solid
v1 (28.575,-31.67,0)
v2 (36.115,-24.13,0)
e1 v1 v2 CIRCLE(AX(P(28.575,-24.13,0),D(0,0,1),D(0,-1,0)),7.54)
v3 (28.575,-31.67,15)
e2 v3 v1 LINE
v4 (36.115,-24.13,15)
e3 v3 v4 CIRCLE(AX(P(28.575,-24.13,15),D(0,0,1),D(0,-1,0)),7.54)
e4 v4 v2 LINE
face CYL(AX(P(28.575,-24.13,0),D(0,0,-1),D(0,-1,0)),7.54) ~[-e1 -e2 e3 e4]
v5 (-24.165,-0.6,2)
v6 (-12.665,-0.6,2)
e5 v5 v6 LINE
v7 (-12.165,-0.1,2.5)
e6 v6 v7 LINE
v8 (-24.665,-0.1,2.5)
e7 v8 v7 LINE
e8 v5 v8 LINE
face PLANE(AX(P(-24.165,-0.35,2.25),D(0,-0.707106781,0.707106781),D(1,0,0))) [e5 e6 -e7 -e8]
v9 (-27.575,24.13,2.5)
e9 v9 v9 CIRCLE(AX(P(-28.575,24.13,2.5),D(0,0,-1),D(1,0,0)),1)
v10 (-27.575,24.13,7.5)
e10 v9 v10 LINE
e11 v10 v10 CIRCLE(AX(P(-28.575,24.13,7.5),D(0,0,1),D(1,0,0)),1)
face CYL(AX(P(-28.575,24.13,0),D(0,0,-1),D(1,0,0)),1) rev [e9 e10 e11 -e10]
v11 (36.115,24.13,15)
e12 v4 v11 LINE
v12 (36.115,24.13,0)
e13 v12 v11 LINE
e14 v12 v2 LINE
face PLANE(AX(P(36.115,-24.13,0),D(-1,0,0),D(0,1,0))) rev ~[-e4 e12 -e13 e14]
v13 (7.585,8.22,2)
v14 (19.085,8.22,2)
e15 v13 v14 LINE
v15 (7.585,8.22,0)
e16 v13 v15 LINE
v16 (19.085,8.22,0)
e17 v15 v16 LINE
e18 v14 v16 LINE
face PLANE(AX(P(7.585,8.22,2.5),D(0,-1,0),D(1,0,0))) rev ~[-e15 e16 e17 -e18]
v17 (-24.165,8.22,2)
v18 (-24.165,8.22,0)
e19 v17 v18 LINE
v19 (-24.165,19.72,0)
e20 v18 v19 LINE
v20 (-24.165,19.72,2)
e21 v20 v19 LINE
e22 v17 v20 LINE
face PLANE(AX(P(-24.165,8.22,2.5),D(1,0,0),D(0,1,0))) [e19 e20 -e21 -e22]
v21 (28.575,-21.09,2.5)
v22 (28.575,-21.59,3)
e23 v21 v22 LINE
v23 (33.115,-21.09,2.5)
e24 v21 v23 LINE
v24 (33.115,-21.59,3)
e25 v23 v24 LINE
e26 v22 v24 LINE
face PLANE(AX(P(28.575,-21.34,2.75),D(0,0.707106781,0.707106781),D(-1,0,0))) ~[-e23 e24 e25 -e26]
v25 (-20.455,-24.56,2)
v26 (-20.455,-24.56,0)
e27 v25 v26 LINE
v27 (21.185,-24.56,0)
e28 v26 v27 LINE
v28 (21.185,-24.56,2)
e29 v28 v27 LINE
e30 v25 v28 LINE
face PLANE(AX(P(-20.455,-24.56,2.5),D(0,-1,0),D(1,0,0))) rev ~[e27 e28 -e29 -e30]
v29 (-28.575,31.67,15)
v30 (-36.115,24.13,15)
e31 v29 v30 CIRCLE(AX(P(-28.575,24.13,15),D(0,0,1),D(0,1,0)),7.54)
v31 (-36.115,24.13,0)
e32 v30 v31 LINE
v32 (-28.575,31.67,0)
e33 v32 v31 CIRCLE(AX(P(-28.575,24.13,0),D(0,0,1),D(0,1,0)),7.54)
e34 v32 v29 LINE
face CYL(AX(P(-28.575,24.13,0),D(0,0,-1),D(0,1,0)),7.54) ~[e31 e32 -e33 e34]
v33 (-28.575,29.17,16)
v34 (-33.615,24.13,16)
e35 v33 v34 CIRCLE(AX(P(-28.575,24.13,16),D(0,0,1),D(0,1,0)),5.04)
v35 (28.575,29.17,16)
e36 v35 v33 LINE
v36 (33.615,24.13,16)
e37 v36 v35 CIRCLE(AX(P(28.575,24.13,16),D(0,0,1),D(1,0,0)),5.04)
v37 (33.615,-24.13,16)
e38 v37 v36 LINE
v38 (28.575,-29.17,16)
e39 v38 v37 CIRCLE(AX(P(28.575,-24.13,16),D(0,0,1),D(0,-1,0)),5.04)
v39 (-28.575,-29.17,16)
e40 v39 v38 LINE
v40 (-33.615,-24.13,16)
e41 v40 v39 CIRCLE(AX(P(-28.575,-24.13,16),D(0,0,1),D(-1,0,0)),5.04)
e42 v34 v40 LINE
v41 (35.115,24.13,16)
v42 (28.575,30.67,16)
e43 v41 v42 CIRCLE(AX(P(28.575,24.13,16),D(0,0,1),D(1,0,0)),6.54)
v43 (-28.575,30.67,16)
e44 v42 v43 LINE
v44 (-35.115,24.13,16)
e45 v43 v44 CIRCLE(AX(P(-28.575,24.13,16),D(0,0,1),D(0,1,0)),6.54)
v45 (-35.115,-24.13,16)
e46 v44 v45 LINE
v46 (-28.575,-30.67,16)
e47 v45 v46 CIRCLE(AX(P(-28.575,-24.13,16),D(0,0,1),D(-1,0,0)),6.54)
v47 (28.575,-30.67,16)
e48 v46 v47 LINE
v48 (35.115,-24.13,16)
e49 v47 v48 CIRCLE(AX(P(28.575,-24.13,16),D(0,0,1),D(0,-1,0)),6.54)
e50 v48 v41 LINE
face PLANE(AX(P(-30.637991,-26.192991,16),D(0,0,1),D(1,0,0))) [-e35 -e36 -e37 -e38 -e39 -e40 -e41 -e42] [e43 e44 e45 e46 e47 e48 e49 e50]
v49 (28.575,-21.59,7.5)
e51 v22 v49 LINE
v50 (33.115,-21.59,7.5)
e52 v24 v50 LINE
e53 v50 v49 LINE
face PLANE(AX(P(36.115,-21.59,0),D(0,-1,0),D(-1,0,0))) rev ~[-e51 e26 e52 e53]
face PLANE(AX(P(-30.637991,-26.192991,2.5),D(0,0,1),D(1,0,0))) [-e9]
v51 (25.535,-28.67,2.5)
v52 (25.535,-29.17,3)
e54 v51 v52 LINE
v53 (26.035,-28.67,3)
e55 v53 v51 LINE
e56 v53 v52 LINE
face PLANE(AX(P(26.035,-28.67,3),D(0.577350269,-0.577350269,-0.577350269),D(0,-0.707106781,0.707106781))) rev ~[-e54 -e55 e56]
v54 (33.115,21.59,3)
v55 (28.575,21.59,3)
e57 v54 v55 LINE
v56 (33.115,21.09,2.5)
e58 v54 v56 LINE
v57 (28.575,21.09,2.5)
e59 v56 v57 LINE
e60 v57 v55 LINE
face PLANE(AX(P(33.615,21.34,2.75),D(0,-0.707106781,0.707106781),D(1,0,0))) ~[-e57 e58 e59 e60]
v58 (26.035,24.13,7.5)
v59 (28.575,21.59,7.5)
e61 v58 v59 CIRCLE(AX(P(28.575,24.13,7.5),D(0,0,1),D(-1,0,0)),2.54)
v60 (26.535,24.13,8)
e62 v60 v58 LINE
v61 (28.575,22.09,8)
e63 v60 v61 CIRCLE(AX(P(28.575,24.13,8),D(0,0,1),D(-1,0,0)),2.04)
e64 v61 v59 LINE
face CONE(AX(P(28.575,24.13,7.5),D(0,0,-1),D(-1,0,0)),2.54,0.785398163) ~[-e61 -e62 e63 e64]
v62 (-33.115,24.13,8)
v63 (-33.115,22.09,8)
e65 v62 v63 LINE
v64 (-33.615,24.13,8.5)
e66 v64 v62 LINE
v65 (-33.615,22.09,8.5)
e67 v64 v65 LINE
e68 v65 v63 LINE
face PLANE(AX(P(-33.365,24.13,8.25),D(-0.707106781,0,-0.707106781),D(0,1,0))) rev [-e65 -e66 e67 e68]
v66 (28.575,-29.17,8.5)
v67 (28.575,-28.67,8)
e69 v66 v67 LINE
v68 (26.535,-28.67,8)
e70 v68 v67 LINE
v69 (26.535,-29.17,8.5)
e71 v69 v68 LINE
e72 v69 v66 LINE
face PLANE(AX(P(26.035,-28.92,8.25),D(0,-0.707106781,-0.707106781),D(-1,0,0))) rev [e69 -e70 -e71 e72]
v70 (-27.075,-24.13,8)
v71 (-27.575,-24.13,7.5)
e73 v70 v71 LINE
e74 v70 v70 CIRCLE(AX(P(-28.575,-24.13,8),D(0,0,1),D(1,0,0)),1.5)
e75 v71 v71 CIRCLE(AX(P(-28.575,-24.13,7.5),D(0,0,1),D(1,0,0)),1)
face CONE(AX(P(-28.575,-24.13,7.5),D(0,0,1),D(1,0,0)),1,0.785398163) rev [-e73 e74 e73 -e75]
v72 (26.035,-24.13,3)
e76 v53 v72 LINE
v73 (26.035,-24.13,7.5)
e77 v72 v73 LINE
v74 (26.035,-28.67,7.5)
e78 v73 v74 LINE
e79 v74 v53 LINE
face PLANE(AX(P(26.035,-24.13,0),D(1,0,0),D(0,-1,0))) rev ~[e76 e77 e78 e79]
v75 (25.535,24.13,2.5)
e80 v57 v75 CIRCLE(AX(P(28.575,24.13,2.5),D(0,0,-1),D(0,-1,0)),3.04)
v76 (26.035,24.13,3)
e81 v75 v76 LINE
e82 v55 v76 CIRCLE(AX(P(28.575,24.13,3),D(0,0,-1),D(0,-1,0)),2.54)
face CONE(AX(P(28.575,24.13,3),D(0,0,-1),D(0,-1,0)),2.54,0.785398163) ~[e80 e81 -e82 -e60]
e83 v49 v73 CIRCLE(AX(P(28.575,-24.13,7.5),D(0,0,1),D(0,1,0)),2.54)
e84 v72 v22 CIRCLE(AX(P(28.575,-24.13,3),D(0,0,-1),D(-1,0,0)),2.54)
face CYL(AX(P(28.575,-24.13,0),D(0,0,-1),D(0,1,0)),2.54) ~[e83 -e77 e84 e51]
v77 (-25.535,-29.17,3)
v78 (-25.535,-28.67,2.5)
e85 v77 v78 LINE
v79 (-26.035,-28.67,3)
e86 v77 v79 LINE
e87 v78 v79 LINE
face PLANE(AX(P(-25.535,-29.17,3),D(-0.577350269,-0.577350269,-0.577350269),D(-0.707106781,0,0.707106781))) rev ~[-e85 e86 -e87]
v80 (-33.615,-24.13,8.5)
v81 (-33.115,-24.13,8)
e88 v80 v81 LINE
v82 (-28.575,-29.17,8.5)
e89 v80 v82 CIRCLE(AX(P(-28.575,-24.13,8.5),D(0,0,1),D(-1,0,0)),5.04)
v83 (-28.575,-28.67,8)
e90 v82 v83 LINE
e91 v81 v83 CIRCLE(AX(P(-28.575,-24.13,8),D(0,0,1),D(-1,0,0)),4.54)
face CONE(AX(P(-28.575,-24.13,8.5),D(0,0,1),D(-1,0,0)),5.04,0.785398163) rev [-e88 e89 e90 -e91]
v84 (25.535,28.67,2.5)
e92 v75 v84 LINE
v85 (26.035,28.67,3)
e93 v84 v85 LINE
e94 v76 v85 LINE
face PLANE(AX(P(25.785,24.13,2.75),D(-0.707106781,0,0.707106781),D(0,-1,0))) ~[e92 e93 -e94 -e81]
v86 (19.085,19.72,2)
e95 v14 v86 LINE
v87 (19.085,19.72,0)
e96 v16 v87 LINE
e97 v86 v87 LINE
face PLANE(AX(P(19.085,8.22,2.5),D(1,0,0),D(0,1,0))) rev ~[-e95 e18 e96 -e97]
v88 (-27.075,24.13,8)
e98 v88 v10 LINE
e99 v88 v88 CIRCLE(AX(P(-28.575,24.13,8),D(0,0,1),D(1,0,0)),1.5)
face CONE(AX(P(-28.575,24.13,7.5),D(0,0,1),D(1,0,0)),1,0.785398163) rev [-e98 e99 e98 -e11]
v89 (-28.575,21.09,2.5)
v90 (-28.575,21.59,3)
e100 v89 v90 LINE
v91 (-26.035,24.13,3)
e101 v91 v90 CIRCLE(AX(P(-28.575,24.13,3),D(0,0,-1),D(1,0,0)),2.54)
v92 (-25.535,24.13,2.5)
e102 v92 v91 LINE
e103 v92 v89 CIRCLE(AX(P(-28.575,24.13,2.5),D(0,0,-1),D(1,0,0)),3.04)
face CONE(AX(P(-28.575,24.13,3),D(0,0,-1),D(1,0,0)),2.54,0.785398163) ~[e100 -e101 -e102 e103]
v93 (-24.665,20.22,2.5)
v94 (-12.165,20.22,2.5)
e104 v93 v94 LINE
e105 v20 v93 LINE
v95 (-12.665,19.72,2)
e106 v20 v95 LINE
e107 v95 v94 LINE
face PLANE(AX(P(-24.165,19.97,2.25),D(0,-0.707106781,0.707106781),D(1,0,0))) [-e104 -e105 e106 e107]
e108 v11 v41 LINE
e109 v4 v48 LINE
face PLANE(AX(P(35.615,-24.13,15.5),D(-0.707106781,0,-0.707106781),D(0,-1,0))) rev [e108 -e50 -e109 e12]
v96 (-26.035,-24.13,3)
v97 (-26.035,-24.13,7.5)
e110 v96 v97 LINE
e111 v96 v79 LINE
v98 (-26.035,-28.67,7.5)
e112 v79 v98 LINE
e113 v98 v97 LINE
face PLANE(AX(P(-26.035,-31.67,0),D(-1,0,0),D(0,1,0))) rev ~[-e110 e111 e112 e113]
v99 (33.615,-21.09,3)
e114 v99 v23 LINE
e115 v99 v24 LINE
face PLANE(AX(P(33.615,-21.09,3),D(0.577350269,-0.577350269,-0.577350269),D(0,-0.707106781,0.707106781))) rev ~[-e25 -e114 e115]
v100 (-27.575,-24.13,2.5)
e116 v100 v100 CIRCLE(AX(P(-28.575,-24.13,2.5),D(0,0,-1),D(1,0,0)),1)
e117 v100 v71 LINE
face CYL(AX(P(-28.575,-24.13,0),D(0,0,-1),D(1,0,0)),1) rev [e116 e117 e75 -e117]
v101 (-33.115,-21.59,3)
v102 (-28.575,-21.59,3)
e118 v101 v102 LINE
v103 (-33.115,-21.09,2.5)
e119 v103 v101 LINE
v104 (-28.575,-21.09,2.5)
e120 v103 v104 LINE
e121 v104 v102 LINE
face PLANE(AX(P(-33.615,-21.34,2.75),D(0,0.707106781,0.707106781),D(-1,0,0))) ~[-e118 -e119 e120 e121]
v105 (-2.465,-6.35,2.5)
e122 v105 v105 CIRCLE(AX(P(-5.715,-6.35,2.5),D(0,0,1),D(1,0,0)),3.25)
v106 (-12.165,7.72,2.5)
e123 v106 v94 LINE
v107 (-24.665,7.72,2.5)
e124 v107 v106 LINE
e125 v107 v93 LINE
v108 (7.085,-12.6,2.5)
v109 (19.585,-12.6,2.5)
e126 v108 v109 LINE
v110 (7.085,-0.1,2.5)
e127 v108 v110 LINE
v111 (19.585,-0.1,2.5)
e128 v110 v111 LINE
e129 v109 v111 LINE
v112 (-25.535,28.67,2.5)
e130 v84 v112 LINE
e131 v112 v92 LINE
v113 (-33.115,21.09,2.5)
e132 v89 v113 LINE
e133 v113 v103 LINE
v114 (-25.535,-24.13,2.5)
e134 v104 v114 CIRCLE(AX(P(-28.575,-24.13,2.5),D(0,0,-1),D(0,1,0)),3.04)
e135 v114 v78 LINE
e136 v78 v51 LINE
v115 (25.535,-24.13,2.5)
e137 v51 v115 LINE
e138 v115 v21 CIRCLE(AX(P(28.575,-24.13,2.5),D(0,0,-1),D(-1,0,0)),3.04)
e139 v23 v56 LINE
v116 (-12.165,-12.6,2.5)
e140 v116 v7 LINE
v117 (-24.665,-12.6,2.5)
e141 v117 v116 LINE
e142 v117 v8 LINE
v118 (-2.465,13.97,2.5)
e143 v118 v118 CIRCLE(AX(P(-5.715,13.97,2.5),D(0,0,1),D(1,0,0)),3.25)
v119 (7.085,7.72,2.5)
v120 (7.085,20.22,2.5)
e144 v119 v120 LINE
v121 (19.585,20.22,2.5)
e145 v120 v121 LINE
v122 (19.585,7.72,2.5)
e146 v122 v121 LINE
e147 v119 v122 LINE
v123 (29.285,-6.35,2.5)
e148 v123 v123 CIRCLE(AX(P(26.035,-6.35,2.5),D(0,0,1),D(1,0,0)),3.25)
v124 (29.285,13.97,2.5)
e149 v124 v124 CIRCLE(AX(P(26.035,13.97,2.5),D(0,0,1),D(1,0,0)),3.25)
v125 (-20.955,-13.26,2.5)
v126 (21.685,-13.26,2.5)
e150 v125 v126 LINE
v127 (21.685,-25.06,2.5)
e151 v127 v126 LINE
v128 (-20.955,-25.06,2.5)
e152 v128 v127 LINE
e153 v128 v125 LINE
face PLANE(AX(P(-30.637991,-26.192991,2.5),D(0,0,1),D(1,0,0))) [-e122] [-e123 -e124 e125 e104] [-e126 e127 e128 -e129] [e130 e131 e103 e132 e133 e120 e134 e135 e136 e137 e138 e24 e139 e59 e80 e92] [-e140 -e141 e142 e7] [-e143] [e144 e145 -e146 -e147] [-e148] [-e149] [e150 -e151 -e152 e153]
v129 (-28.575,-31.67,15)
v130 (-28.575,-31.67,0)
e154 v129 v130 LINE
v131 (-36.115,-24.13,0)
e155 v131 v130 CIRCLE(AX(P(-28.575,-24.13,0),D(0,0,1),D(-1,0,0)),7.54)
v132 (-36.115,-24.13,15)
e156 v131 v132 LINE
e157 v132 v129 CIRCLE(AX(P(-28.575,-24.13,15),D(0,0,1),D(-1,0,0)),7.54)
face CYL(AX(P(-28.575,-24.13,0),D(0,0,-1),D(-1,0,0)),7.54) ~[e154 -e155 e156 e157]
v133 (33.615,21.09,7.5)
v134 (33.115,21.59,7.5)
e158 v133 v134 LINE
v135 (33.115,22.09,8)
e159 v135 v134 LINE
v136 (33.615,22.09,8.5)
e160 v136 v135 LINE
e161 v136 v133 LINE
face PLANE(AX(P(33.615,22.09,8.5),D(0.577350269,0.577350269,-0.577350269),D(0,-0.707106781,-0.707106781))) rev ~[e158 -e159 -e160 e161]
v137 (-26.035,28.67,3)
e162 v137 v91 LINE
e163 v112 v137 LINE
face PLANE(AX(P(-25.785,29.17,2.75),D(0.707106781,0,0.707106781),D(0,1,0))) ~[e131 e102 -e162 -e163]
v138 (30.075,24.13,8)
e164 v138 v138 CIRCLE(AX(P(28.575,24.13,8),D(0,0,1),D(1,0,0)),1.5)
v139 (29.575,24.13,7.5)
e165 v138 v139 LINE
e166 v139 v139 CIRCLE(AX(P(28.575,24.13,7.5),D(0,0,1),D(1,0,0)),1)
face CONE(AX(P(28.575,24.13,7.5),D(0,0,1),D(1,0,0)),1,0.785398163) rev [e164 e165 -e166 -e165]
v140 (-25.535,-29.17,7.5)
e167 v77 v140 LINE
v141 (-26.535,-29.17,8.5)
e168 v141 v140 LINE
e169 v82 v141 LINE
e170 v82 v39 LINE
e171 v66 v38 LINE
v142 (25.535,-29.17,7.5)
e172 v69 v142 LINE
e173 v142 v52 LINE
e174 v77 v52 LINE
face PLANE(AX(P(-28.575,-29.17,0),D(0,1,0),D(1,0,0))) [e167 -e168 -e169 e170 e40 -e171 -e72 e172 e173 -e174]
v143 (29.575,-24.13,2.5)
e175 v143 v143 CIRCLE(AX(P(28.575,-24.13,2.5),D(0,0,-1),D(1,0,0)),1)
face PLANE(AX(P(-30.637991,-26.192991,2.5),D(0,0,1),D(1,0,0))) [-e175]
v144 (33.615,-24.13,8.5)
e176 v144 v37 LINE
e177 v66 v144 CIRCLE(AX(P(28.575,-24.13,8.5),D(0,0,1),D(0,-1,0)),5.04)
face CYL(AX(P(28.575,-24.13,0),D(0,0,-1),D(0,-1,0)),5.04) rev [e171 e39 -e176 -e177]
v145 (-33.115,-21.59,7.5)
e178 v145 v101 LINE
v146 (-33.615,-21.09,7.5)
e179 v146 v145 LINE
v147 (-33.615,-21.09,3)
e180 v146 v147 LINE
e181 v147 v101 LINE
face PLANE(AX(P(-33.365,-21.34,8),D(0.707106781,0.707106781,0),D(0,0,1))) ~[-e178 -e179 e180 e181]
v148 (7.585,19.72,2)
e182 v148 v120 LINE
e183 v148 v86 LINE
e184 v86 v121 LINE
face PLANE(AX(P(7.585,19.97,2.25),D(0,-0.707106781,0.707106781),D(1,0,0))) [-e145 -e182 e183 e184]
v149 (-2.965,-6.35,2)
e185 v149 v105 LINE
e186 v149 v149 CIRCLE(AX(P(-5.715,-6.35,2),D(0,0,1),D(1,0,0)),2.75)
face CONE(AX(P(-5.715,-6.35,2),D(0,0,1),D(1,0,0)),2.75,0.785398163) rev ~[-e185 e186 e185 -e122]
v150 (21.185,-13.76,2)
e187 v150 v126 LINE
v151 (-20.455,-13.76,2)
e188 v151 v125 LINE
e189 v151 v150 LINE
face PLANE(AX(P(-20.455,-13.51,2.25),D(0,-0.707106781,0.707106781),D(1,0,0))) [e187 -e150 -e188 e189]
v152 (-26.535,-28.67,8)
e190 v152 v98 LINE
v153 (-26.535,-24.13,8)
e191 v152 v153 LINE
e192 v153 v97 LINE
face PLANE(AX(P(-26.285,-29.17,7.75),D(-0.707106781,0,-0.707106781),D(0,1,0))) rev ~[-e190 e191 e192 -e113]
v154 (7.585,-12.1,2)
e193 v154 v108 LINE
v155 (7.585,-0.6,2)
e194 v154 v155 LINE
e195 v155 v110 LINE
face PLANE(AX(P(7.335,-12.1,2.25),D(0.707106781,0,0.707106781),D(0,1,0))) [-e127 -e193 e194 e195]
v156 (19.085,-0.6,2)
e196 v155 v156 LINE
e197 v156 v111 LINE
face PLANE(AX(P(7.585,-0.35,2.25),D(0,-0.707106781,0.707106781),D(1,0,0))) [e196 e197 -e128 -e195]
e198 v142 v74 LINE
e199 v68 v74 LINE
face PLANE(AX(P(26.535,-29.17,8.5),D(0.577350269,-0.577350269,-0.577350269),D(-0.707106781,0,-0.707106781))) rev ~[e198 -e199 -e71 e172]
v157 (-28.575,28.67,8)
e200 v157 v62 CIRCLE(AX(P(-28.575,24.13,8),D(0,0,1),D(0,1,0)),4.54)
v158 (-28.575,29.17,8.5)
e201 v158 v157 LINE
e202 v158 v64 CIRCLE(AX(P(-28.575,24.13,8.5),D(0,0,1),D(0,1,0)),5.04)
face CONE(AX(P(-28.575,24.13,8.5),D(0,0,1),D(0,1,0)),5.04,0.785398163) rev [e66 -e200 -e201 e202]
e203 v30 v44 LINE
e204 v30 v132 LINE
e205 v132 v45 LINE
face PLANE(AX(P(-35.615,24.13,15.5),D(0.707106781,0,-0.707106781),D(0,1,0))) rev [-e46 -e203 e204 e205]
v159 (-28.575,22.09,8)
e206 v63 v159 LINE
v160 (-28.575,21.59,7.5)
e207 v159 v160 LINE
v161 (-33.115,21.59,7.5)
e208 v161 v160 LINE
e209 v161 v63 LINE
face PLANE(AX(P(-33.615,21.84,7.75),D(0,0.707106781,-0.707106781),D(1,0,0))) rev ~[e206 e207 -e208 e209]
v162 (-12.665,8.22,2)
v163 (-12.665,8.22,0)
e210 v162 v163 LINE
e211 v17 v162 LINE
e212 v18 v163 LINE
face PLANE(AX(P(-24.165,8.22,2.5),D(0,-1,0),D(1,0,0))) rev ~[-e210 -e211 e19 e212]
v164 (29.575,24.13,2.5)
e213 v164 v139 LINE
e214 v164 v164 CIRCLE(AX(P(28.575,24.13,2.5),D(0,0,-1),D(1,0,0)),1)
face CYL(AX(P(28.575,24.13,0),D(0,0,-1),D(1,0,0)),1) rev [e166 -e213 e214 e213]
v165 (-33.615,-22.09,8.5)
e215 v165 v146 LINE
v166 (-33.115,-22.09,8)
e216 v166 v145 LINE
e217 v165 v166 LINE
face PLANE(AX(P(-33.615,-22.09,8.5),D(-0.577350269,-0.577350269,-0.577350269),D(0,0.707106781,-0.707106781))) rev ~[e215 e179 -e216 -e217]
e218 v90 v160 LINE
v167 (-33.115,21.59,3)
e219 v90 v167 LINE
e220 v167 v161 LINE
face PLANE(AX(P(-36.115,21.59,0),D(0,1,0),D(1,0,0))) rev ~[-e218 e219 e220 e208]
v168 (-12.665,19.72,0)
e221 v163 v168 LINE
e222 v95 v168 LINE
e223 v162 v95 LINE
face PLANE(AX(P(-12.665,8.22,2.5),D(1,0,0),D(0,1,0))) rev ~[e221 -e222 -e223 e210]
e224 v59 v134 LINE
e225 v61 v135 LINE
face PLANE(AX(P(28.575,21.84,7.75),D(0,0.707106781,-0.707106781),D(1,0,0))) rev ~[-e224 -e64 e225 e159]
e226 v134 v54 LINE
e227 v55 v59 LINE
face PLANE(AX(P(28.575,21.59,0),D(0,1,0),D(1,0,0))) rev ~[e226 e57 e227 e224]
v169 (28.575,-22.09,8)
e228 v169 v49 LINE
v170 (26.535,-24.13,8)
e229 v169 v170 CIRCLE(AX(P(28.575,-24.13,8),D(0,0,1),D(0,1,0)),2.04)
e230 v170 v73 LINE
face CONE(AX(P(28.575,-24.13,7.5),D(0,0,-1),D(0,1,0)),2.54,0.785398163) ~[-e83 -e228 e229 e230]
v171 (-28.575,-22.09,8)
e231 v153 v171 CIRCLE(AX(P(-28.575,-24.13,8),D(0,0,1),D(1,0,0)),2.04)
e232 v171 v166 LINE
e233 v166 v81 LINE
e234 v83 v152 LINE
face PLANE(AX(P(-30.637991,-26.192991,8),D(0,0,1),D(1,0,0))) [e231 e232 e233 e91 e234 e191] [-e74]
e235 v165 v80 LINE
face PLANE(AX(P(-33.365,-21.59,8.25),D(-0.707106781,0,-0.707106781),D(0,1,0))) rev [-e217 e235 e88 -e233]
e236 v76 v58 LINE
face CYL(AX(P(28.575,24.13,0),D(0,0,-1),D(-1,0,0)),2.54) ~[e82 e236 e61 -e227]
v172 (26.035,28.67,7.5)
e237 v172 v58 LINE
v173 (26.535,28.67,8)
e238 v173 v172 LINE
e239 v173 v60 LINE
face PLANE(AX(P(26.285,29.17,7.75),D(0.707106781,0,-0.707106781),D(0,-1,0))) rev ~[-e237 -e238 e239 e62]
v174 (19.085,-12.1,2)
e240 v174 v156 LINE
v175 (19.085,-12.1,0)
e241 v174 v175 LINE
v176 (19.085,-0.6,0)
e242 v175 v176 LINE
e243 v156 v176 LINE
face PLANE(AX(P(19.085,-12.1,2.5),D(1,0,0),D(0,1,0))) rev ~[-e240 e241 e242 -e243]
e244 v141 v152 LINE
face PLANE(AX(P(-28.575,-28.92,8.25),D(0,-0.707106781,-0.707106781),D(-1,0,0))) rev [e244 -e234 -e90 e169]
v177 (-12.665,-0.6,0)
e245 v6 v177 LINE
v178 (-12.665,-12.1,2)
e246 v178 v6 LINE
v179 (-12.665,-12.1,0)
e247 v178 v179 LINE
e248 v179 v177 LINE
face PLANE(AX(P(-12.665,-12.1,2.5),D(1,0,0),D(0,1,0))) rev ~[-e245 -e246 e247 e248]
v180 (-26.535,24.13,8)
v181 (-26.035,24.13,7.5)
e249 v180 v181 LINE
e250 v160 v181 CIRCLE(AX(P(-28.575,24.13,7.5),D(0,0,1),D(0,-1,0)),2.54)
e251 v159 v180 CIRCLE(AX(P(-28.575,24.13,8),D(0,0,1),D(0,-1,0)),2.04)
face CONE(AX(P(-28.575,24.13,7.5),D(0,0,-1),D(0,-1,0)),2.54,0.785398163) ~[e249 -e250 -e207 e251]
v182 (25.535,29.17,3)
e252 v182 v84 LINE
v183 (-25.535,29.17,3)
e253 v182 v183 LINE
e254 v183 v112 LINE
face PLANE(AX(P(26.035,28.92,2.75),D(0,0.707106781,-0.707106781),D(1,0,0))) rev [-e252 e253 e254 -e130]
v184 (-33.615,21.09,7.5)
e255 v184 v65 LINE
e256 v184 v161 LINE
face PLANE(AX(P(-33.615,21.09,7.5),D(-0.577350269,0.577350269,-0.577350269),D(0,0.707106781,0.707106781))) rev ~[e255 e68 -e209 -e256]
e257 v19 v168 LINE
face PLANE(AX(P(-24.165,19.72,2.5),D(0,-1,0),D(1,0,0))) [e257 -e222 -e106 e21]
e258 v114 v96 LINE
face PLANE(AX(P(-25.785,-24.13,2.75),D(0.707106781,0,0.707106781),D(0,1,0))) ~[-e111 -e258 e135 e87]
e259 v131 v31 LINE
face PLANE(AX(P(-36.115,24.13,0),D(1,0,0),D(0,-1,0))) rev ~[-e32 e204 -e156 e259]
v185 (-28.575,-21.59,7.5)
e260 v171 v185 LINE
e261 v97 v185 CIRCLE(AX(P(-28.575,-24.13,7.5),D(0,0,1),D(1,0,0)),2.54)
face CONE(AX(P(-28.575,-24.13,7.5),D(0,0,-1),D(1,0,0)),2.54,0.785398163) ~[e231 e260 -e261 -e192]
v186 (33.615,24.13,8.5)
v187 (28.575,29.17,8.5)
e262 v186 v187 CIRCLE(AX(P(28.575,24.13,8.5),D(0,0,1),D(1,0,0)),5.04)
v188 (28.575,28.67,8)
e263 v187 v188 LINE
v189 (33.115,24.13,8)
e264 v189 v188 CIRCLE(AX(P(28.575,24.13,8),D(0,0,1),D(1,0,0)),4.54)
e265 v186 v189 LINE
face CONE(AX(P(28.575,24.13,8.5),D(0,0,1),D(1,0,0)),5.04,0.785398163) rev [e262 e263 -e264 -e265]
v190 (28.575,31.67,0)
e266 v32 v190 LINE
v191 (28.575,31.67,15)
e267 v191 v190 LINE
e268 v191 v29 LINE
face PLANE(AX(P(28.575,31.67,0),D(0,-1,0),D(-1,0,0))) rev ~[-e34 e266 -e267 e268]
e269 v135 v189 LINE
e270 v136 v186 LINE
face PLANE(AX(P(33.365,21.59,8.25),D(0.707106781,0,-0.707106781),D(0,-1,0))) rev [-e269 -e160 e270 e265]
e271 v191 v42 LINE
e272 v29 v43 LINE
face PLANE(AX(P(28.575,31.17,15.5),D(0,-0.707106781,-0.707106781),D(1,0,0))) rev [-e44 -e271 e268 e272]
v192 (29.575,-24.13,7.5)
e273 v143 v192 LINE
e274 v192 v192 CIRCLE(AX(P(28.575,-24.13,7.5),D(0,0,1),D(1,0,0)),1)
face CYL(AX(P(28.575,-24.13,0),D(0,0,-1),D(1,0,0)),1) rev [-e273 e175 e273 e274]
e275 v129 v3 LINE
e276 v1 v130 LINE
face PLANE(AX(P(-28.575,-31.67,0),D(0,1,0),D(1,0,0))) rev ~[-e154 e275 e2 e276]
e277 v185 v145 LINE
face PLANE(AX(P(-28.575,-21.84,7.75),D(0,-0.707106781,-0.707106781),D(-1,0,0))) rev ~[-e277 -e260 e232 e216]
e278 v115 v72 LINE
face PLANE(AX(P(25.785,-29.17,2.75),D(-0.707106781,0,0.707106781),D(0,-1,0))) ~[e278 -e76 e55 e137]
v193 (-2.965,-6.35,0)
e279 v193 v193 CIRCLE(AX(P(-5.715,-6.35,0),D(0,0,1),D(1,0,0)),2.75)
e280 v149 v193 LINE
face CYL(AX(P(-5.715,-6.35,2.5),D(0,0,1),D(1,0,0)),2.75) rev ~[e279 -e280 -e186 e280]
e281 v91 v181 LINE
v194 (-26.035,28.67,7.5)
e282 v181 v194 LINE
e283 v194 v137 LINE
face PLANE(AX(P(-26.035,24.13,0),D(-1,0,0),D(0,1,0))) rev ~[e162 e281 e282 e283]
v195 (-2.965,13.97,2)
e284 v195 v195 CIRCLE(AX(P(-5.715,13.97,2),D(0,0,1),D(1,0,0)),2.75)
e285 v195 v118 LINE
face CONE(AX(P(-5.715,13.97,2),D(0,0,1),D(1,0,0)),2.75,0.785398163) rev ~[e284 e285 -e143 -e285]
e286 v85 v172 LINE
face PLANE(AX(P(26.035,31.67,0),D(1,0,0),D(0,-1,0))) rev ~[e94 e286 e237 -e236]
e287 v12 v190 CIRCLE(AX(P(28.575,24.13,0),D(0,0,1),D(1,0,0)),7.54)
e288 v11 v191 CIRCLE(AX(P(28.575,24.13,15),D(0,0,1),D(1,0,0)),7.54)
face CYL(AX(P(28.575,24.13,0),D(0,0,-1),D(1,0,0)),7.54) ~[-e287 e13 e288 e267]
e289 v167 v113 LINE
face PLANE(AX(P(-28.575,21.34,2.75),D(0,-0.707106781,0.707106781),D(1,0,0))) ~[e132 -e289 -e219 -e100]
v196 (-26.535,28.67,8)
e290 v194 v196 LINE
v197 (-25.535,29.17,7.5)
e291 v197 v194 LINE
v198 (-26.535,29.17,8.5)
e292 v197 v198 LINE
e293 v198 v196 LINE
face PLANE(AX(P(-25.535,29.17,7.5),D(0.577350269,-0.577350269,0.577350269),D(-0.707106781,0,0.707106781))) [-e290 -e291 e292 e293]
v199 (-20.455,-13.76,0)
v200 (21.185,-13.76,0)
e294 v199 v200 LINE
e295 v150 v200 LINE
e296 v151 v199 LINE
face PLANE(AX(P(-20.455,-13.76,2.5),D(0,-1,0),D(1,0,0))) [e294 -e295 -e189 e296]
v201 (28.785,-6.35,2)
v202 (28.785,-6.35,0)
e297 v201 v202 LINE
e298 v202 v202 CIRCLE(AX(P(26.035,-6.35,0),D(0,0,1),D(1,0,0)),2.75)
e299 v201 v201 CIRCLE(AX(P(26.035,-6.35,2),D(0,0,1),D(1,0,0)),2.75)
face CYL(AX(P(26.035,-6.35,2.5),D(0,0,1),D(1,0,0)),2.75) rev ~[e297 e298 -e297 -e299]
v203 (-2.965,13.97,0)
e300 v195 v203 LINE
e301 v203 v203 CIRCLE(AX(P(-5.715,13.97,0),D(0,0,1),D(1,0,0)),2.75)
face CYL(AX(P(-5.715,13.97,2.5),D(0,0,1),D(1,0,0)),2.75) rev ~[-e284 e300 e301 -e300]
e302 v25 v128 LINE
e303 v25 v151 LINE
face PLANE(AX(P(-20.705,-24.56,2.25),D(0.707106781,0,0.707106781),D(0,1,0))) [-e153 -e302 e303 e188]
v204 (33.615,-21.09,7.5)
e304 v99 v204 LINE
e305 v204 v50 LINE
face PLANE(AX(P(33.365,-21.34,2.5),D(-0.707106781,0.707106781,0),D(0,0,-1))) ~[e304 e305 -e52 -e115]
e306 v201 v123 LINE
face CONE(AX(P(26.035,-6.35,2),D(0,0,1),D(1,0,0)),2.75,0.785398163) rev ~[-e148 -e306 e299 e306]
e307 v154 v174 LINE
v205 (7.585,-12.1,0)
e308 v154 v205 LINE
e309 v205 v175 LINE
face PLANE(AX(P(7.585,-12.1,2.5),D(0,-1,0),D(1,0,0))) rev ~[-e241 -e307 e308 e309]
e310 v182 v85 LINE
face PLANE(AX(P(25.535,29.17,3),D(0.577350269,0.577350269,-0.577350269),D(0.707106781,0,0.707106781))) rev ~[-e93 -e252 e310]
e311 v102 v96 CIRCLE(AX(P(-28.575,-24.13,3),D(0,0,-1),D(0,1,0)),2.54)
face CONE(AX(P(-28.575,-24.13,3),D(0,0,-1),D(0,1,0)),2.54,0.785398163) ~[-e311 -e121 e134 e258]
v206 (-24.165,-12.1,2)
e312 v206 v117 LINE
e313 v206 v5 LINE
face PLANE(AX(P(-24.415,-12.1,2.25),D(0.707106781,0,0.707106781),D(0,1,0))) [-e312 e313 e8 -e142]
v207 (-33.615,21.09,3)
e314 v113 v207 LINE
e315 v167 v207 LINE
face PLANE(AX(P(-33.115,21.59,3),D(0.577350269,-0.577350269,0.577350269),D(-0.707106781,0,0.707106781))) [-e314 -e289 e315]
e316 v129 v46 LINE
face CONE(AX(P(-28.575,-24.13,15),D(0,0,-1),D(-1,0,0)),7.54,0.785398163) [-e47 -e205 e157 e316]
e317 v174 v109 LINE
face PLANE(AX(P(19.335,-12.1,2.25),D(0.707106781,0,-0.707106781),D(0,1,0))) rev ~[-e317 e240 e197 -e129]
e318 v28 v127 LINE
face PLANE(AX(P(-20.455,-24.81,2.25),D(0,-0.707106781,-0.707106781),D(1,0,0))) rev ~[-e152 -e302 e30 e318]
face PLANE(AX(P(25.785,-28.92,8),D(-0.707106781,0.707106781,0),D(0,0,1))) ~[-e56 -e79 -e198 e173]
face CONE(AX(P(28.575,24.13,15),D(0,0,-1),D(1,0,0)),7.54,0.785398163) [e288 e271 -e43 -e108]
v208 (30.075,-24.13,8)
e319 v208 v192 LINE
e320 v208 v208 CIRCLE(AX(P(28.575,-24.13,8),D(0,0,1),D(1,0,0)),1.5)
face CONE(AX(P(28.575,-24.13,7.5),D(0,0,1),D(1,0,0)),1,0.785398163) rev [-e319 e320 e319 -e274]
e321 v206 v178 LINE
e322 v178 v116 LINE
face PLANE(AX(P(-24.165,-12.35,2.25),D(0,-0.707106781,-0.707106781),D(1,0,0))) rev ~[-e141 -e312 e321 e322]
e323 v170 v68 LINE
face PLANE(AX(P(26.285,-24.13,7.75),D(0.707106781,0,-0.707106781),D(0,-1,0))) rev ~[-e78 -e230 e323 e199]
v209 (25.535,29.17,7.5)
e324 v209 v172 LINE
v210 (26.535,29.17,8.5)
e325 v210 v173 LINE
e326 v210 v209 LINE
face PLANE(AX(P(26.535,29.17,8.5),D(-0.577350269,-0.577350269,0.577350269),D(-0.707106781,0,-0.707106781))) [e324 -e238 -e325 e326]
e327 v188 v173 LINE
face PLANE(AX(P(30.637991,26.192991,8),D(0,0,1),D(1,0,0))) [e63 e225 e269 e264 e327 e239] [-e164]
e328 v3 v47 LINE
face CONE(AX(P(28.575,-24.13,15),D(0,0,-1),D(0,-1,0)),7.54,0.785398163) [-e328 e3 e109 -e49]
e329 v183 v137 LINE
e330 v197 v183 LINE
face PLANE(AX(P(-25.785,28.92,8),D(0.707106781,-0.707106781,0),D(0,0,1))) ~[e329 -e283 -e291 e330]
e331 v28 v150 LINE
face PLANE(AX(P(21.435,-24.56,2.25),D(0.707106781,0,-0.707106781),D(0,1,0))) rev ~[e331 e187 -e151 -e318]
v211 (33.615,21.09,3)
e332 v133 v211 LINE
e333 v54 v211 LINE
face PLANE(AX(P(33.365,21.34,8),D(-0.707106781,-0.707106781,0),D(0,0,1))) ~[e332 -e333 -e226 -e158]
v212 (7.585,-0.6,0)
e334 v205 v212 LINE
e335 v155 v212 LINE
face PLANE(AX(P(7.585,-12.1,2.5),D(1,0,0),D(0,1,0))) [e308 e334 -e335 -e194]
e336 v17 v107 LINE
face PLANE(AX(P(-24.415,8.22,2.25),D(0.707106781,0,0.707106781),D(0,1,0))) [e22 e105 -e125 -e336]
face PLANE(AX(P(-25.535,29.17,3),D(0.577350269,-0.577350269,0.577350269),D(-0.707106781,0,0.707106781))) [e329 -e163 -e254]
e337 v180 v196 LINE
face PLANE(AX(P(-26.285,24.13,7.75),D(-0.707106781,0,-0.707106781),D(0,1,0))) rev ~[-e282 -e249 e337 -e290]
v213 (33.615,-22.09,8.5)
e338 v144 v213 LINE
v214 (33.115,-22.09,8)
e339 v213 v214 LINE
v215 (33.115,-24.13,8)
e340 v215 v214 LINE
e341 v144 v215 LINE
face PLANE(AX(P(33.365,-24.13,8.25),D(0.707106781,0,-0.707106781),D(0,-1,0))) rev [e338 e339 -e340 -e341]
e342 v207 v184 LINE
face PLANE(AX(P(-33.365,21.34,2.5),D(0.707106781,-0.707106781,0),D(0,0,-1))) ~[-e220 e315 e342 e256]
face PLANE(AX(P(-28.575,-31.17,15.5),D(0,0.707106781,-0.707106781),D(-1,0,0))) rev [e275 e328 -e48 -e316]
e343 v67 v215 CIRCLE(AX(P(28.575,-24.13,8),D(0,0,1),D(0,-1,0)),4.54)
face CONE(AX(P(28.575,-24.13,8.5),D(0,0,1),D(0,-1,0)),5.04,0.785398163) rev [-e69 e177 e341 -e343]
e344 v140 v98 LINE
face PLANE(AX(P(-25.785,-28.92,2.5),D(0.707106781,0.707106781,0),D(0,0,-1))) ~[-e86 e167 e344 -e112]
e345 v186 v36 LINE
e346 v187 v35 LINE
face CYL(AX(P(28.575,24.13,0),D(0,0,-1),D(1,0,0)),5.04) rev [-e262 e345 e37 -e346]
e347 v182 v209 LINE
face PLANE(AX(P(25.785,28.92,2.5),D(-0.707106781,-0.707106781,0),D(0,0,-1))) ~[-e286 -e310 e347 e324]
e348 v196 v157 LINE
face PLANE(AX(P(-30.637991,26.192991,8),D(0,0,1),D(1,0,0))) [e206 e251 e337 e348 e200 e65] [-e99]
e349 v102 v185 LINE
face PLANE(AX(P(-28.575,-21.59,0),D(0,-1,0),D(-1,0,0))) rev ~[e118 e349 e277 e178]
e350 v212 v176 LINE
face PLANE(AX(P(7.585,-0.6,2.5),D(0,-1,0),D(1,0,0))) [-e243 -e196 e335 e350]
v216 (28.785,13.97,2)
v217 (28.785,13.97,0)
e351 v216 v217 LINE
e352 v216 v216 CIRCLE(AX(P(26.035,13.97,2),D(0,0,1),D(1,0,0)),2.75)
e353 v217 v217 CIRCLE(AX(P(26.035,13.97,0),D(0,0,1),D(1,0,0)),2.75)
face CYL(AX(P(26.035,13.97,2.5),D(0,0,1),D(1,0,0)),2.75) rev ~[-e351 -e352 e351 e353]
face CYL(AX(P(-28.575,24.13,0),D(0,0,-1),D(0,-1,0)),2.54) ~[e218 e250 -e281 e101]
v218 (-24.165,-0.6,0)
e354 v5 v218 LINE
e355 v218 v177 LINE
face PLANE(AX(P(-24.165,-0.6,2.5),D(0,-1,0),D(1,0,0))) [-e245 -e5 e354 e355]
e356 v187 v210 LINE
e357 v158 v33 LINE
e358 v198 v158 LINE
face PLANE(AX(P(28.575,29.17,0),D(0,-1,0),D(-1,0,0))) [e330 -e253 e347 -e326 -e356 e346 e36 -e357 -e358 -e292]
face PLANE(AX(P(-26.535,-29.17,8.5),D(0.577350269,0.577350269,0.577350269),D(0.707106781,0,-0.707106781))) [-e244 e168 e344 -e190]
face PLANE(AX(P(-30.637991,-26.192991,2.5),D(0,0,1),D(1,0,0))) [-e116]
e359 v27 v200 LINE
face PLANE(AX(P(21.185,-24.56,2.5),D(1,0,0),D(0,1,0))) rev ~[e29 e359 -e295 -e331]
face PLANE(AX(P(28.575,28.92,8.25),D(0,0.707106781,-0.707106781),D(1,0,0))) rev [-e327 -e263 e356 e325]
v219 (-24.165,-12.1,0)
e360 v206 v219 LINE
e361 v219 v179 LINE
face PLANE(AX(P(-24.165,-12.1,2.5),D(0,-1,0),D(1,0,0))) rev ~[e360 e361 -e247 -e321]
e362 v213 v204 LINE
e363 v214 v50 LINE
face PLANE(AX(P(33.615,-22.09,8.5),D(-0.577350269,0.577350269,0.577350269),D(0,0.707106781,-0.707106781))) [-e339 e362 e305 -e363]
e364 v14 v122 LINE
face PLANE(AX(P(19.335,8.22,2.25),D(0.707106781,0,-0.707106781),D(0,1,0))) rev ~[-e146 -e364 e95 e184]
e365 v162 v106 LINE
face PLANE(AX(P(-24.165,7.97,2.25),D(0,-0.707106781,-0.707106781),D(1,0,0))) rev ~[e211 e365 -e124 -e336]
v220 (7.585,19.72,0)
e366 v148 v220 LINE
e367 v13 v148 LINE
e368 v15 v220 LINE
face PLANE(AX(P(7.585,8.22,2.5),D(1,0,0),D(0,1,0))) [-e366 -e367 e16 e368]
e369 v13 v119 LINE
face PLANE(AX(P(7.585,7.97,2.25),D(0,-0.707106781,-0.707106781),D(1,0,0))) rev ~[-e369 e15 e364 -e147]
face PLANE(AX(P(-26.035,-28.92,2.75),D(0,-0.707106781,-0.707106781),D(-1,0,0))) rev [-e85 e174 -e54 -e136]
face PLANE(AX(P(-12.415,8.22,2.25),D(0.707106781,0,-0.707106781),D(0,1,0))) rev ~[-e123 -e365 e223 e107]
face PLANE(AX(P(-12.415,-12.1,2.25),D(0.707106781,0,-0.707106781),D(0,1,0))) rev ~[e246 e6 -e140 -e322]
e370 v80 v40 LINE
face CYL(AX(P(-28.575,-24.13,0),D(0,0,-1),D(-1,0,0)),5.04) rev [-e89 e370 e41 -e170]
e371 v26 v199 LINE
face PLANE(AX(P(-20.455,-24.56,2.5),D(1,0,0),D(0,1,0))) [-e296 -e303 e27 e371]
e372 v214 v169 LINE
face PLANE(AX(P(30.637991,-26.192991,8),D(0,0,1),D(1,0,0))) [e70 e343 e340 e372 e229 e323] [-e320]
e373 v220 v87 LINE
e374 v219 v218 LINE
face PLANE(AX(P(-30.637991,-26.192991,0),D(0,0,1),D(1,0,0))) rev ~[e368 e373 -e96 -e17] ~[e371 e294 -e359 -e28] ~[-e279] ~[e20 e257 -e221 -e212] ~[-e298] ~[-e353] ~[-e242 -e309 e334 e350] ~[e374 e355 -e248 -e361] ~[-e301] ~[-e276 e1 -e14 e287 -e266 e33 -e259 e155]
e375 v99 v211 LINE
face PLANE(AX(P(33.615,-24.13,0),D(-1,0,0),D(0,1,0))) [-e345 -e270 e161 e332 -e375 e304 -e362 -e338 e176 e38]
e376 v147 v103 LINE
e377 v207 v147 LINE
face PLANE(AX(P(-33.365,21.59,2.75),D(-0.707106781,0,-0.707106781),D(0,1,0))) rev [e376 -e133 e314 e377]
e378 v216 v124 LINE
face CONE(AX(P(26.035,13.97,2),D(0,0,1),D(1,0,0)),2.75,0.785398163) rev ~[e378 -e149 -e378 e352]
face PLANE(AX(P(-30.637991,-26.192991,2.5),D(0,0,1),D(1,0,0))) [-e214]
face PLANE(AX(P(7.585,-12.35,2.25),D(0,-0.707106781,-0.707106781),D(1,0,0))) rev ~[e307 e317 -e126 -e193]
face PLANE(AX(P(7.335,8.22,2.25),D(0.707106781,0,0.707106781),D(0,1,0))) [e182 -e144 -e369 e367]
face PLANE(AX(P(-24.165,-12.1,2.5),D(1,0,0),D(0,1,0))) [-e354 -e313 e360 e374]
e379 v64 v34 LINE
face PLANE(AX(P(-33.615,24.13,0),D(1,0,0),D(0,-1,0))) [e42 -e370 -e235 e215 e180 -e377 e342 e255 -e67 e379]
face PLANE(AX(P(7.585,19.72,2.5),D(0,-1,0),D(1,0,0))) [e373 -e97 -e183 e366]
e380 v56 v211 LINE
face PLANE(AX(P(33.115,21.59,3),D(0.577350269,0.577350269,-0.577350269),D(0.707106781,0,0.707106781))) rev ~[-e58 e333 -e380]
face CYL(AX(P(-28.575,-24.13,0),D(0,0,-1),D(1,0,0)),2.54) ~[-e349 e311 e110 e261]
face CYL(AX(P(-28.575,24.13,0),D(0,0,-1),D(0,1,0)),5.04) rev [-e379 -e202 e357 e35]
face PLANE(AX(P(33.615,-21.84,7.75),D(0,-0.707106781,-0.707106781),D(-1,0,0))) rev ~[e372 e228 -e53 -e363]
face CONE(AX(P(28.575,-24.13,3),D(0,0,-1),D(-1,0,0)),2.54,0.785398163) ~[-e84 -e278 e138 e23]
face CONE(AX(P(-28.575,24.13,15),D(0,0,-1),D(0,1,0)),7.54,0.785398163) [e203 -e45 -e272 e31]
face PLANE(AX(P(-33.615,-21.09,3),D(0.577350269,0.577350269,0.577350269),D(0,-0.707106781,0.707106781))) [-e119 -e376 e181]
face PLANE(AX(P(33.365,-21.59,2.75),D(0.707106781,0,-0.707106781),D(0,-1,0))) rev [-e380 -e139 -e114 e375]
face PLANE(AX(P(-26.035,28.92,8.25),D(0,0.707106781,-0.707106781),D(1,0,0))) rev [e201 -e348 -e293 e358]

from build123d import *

# Parameters (mm, degrees)
F0_R     = 1
F1_DEPTH = 16
F2_T     = -2.5
F3_DEPTH = 8
F4_W     = 41.64
F4_H     = 10.8
F4_W_2   = 11.5
F4_H_2   = 11.5
F4_R     = 2.75
F5_DEPTH = 2.501
F6_SIZE  = 1
F7_SIZE  = 0.5


with BuildPart() as f1:
    # F0 (on Top) → F1 (new body)
    with BuildSketch(Plane.XY):
        with BuildLine():
            ThreePointArc((-36.115, -24.13), (-33.9065851301, -29.4615851301), (-28.575, -31.67))
            Line((-28.575, -31.67), (-26.035, -31.67))
            Line((-26.035, -31.67), (-26.035, -24.13))
            ThreePointArc((-26.035, -24.13), (-26.7789487758, -22.3339487758), (-28.575, -21.59))
            Line((-28.575, -21.59), (-36.115, -21.59))
            Line((-36.115, -21.59), (-36.115, -24.13))
        make_face()
        with Locations((-28.575, -24.13)):
            Circle(F0_R, mode=Mode.SUBTRACT)
        with BuildLine():
            Line((-26.035, -24.13), (-26.035, -31.67))
            Line((-26.035, -31.67), (26.035, -31.67))
            Line((26.035, -31.67), (26.035, -24.13))
            ThreePointArc((26.035, -24.13), (26.7789487758, -22.3339487758), (28.575, -21.59))
            Line((28.575, -21.59), (36.115, -21.59))
            Line((36.115, -21.59), (36.115, 21.59))
            Line((36.115, 21.59), (28.575, 21.59))
            ThreePointArc((28.575, 21.59), (26.7789487758, 22.3339487758), (26.035, 24.13))
            Line((26.035, 24.13), (26.035, 31.67))
            Line((26.035, 31.67), (-26.035, 31.67))
            Line((-26.035, 31.67), (-26.035, 24.13))
            ThreePointArc((-26.035, 24.13), (-26.7789487758, 22.3339487758), (-28.575, 21.59))
            Line((-28.575, 21.59), (-36.115, 21.59))
            Line((-36.115, 21.59), (-36.115, -21.59))
            Line((-36.115, -21.59), (-28.575, -21.59))
            ThreePointArc((-28.575, -21.59), (-26.7789487758, -22.3339487758), (-26.035, -24.13))
        make_face()
        with BuildLine():
            Line((-36.115, 24.13), (-36.115, 21.59))
            Line((-36.115, 21.59), (-28.575, 21.59))
            ThreePointArc((-28.575, 21.59), (-26.7789487758, 22.3339487758), (-26.035, 24.13))
            Line((-26.035, 24.13), (-26.035, 31.67))
            Line((-26.035, 31.67), (-28.575, 31.67))
            ThreePointArc((-28.575, 31.67), (-33.9065851301, 29.4615851301), (-36.115, 24.13))
        make_face()
        with Locations((-28.575, 24.13)):
            Circle(F0_R, mode=Mode.SUBTRACT)
        with BuildLine():
            Line((26.035, -24.13), (26.035, -31.67))
            Line((26.035, -31.67), (28.575, -31.67))
            ThreePointArc((28.575, -31.67), (33.9065851301, -29.4615851301), (36.115, -24.13))
            Line((36.115, -24.13), (36.115, -21.59))
            Line((36.115, -21.59), (28.575, -21.59))
            ThreePointArc((28.575, -21.59), (26.7789487758, -22.3339487758), (26.035, -24.13))
        make_face()
        with Locations((28.575, -24.13)):
            Circle(F0_R, mode=Mode.SUBTRACT)
        with BuildLine():
            Line((28.575, 21.59), (36.115, 21.59))
            Line((36.115, 21.59), (36.115, 24.13))
            ThreePointArc((36.115, 24.13), (33.9065851301, 29.4615851301), (28.575, 31.67))
            Line((28.575, 31.67), (26.035, 31.67))
            Line((26.035, 31.67), (26.035, 24.13))
            ThreePointArc((26.035, 24.13), (26.7789487758, 22.3339487758), (28.575, 21.59))
        make_face()
        with Locations((28.575, 24.13)):
            Circle(F0_R, mode=Mode.SUBTRACT)
        with Locations((28.575, -24.13)):
            Circle(F0_R)
        with Locations((28.575, 24.13)):
            Circle(F0_R)
        with Locations((-28.575, -24.13)):
            Circle(F0_R)
        with Locations((-28.575, 24.13)):
            Circle(F0_R)
    extrude(amount=F1_DEPTH)

    # F2
    f2_openings = [f1.faces().sort_by_distance(p)[0] for p in [
        (0, 0, 16),
    ]]
    offset(amount=F2_T, openings=f2_openings)

    # F0 (on Top) → F3 (join)
    with BuildSketch(Plane.XY):
        with BuildLine():
            Line((26.035, -24.13), (26.035, -31.67))
            Line((26.035, -31.67), (28.575, -31.67))
            ThreePointArc((28.575, -31.67), (33.9065851301, -29.4615851301), (36.115, -24.13))
            Line((36.115, -24.13), (36.115, -21.59))
            Line((36.115, -21.59), (28.575, -21.59))
            ThreePointArc((28.575, -21.59), (26.7789487758, -22.3339487758), (26.035, -24.13))
        make_face()
        with Locations((28.575, -24.13)):
            Circle(F0_R, mode=Mode.SUBTRACT)
        with BuildLine():
            Line((28.575, 21.59), (36.115, 21.59))
            Line((36.115, 21.59), (36.115, 24.13))
            ThreePointArc((36.115, 24.13), (33.9065851301, 29.4615851301), (28.575, 31.67))
            Line((28.575, 31.67), (26.035, 31.67))
            Line((26.035, 31.67), (26.035, 24.13))
            ThreePointArc((26.035, 24.13), (26.7789487758, 22.3339487758), (28.575, 21.59))
        make_face()
        with Locations((28.575, 24.13)):
            Circle(F0_R, mode=Mode.SUBTRACT)
        with BuildLine():
            Line((-36.115, 24.13), (-36.115, 21.59))
            Line((-36.115, 21.59), (-28.575, 21.59))
            ThreePointArc((-28.575, 21.59), (-26.7789487758, 22.3339487758), (-26.035, 24.13))
            Line((-26.035, 24.13), (-26.035, 31.67))
            Line((-26.035, 31.67), (-28.575, 31.67))
            ThreePointArc((-28.575, 31.67), (-33.9065851301, 29.4615851301), (-36.115, 24.13))
        make_face()
        with Locations((-28.575, 24.13)):
            Circle(F0_R, mode=Mode.SUBTRACT)
        with BuildLine():
            ThreePointArc((-36.115, -24.13), (-33.9065851301, -29.4615851301), (-28.575, -31.67))
            Line((-28.575, -31.67), (-26.035, -31.67))
            Line((-26.035, -31.67), (-26.035, -24.13))
            ThreePointArc((-26.035, -24.13), (-26.7789487758, -22.3339487758), (-28.575, -21.59))
            Line((-28.575, -21.59), (-36.115, -21.59))
            Line((-36.115, -21.59), (-36.115, -24.13))
        make_face()
        with Locations((-28.575, -24.13)):
            Circle(F0_R, mode=Mode.SUBTRACT)
    extrude(amount=F3_DEPTH)

    # F4 (on face) → F5 (cut, through all)
    with BuildSketch(Plane.XY.offset(2.5)):
        with Locations((0.365, -19.16)):
            Rectangle(F4_W, F4_H)
        with Locations((-18.415, 13.97)):
            Rectangle(F4_W_2, F4_H_2)
        with Locations((-5.715, 13.97)):
            Circle(F4_R)
        with Locations((-18.415, -6.35)):
            Rectangle(F4_W_2, F4_H_2)
        with Locations((-5.715, -6.35)):
            Circle(F4_R)
        with Locations((13.335, 13.97)):
            Rectangle(F4_W_2, F4_H_2)
        with Locations((26.035, 13.97)):
            Circle(F4_R)
        with Locations((13.335, -6.35)):
            Rectangle(F4_W_2, F4_H_2)
        with Locations((26.035, -6.35)):
            Circle(F4_R)
    extrude(amount=-F5_DEPTH, mode=Mode.SUBTRACT)

    # F6
    f6_edges = [f1.edges().sort_by_distance(p)[0] for p in [
        (-36.115, 0, 16),
        (-33.906585, -29.461585, 16),
        (0, -31.67, 16),
        (33.906585, -29.461585, 16),
        (36.115, 0, 16),
        (33.906585, 29.461585, 16),
        (0, 31.67, 16),
        (-33.906585, 29.461585, 16),
    ]]
    chamfer(f6_edges, length=F6_SIZE)

    # F7
    f7_edges = [f1.edges().sort_by_distance(p)[0] for p in [
        (-33.615, 22.86, 8),
        (-32.138818, 27.693818, 8),
        (-27.305, 29.17, 8),
        (-26.035, 26.65, 8),
        (-26.778949, 22.333949, 8),
        (-31.095, 21.59, 8),
        (-29.575, 24.13, 8),
        (26.778949, 22.333949, 8),
        (26.035, 26.65, 8),
        (27.305, 29.17, 8),
        (32.138818, 27.693818, 8),
        (33.615, 22.86, 8),
        (31.095, 21.59, 8),
        (27.575, 24.13, 8),
        (26.778949, -22.333949, 8),
        (31.095, -21.59, 8),
        (33.615, -22.86, 8),
        (32.138818, -27.693818, 8),
        (27.305, -29.17, 8),
        (26.035, -26.65, 8),
        (27.575, -24.13, 8),
        (-31.095, -21.59, 8),
        (-26.778949, -22.333949, 8),
        (-26.035, -26.65, 8),
        (-27.305, -29.17, 8),
        (-32.138818, -27.693818, 8),
        (-33.615, -22.86, 8),
        (-29.575, -24.13, 8),
        (-26.035, -26.65, 2.5),
        (-26.778949, -22.333949, 2.5),
        (0, -29.17, 2.5),
        (-31.095, -21.59, 2.5),
        (26.035, -26.65, 2.5),
        (-33.615, 0, 2.5),
        (26.778949, -22.333949, 2.5),
        (-31.095, 21.59, 2.5),
        (31.095, -21.59, 2.5),
        (-26.778949, 22.333949, 2.5),
        (33.615, 0, 2.5),
        (-26.035, 26.65, 2.5),
        (31.095, 21.59, 2.5),
        (0, 29.17, 2.5),
        (26.778949, 22.333949, 2.5),
        (26.035, 26.65, 2.5),
        (0.365, -13.76, 2.5),
        (-20.455, -19.16, 2.5),
        (0.365, -24.56, 2.5),
        (21.185, -19.16, 2.5),
        (-12.665, -6.35, 2.5),
        (-18.415, -0.6, 2.5),
        (-24.165, -6.35, 2.5),
        (-18.415, -12.1, 2.5),
        (-8.465, -6.35, 2.5),
        (13.335, -12.1, 2.5),
        (19.085, -6.35, 2.5),
        (13.335, -0.6, 2.5),
        (7.585, -6.35, 2.5),
        (23.285, -6.35, 2.5),
        (-12.665, 13.97, 2.5),
        (-18.415, 19.72, 2.5),
        (-24.165, 13.97, 2.5),
        (-18.415, 8.22, 2.5),
        (-8.465, 13.97, 2.5),
        (13.335, 8.22, 2.5),
        (19.085, 13.97, 2.5),
        (13.335, 19.72, 2.5),
        (7.585, 13.97, 2.5),
        (23.285, 13.97, 2.5),
        (-33.615, 21.59, 5.25),
        (-33.615, -21.59, 5.25),
        (26.035, 29.17, 5.25),
        (-26.035, 29.17, 5.25),
        (33.615, -21.59, 5.25),
        (33.615, 21.59, 5.25),
        (-26.035, -29.17, 5.25),
        (26.035, -29.17, 5.25),
    ]]
    chamfer(f7_edges, length=F7_SIZE)


solid = f1.part
